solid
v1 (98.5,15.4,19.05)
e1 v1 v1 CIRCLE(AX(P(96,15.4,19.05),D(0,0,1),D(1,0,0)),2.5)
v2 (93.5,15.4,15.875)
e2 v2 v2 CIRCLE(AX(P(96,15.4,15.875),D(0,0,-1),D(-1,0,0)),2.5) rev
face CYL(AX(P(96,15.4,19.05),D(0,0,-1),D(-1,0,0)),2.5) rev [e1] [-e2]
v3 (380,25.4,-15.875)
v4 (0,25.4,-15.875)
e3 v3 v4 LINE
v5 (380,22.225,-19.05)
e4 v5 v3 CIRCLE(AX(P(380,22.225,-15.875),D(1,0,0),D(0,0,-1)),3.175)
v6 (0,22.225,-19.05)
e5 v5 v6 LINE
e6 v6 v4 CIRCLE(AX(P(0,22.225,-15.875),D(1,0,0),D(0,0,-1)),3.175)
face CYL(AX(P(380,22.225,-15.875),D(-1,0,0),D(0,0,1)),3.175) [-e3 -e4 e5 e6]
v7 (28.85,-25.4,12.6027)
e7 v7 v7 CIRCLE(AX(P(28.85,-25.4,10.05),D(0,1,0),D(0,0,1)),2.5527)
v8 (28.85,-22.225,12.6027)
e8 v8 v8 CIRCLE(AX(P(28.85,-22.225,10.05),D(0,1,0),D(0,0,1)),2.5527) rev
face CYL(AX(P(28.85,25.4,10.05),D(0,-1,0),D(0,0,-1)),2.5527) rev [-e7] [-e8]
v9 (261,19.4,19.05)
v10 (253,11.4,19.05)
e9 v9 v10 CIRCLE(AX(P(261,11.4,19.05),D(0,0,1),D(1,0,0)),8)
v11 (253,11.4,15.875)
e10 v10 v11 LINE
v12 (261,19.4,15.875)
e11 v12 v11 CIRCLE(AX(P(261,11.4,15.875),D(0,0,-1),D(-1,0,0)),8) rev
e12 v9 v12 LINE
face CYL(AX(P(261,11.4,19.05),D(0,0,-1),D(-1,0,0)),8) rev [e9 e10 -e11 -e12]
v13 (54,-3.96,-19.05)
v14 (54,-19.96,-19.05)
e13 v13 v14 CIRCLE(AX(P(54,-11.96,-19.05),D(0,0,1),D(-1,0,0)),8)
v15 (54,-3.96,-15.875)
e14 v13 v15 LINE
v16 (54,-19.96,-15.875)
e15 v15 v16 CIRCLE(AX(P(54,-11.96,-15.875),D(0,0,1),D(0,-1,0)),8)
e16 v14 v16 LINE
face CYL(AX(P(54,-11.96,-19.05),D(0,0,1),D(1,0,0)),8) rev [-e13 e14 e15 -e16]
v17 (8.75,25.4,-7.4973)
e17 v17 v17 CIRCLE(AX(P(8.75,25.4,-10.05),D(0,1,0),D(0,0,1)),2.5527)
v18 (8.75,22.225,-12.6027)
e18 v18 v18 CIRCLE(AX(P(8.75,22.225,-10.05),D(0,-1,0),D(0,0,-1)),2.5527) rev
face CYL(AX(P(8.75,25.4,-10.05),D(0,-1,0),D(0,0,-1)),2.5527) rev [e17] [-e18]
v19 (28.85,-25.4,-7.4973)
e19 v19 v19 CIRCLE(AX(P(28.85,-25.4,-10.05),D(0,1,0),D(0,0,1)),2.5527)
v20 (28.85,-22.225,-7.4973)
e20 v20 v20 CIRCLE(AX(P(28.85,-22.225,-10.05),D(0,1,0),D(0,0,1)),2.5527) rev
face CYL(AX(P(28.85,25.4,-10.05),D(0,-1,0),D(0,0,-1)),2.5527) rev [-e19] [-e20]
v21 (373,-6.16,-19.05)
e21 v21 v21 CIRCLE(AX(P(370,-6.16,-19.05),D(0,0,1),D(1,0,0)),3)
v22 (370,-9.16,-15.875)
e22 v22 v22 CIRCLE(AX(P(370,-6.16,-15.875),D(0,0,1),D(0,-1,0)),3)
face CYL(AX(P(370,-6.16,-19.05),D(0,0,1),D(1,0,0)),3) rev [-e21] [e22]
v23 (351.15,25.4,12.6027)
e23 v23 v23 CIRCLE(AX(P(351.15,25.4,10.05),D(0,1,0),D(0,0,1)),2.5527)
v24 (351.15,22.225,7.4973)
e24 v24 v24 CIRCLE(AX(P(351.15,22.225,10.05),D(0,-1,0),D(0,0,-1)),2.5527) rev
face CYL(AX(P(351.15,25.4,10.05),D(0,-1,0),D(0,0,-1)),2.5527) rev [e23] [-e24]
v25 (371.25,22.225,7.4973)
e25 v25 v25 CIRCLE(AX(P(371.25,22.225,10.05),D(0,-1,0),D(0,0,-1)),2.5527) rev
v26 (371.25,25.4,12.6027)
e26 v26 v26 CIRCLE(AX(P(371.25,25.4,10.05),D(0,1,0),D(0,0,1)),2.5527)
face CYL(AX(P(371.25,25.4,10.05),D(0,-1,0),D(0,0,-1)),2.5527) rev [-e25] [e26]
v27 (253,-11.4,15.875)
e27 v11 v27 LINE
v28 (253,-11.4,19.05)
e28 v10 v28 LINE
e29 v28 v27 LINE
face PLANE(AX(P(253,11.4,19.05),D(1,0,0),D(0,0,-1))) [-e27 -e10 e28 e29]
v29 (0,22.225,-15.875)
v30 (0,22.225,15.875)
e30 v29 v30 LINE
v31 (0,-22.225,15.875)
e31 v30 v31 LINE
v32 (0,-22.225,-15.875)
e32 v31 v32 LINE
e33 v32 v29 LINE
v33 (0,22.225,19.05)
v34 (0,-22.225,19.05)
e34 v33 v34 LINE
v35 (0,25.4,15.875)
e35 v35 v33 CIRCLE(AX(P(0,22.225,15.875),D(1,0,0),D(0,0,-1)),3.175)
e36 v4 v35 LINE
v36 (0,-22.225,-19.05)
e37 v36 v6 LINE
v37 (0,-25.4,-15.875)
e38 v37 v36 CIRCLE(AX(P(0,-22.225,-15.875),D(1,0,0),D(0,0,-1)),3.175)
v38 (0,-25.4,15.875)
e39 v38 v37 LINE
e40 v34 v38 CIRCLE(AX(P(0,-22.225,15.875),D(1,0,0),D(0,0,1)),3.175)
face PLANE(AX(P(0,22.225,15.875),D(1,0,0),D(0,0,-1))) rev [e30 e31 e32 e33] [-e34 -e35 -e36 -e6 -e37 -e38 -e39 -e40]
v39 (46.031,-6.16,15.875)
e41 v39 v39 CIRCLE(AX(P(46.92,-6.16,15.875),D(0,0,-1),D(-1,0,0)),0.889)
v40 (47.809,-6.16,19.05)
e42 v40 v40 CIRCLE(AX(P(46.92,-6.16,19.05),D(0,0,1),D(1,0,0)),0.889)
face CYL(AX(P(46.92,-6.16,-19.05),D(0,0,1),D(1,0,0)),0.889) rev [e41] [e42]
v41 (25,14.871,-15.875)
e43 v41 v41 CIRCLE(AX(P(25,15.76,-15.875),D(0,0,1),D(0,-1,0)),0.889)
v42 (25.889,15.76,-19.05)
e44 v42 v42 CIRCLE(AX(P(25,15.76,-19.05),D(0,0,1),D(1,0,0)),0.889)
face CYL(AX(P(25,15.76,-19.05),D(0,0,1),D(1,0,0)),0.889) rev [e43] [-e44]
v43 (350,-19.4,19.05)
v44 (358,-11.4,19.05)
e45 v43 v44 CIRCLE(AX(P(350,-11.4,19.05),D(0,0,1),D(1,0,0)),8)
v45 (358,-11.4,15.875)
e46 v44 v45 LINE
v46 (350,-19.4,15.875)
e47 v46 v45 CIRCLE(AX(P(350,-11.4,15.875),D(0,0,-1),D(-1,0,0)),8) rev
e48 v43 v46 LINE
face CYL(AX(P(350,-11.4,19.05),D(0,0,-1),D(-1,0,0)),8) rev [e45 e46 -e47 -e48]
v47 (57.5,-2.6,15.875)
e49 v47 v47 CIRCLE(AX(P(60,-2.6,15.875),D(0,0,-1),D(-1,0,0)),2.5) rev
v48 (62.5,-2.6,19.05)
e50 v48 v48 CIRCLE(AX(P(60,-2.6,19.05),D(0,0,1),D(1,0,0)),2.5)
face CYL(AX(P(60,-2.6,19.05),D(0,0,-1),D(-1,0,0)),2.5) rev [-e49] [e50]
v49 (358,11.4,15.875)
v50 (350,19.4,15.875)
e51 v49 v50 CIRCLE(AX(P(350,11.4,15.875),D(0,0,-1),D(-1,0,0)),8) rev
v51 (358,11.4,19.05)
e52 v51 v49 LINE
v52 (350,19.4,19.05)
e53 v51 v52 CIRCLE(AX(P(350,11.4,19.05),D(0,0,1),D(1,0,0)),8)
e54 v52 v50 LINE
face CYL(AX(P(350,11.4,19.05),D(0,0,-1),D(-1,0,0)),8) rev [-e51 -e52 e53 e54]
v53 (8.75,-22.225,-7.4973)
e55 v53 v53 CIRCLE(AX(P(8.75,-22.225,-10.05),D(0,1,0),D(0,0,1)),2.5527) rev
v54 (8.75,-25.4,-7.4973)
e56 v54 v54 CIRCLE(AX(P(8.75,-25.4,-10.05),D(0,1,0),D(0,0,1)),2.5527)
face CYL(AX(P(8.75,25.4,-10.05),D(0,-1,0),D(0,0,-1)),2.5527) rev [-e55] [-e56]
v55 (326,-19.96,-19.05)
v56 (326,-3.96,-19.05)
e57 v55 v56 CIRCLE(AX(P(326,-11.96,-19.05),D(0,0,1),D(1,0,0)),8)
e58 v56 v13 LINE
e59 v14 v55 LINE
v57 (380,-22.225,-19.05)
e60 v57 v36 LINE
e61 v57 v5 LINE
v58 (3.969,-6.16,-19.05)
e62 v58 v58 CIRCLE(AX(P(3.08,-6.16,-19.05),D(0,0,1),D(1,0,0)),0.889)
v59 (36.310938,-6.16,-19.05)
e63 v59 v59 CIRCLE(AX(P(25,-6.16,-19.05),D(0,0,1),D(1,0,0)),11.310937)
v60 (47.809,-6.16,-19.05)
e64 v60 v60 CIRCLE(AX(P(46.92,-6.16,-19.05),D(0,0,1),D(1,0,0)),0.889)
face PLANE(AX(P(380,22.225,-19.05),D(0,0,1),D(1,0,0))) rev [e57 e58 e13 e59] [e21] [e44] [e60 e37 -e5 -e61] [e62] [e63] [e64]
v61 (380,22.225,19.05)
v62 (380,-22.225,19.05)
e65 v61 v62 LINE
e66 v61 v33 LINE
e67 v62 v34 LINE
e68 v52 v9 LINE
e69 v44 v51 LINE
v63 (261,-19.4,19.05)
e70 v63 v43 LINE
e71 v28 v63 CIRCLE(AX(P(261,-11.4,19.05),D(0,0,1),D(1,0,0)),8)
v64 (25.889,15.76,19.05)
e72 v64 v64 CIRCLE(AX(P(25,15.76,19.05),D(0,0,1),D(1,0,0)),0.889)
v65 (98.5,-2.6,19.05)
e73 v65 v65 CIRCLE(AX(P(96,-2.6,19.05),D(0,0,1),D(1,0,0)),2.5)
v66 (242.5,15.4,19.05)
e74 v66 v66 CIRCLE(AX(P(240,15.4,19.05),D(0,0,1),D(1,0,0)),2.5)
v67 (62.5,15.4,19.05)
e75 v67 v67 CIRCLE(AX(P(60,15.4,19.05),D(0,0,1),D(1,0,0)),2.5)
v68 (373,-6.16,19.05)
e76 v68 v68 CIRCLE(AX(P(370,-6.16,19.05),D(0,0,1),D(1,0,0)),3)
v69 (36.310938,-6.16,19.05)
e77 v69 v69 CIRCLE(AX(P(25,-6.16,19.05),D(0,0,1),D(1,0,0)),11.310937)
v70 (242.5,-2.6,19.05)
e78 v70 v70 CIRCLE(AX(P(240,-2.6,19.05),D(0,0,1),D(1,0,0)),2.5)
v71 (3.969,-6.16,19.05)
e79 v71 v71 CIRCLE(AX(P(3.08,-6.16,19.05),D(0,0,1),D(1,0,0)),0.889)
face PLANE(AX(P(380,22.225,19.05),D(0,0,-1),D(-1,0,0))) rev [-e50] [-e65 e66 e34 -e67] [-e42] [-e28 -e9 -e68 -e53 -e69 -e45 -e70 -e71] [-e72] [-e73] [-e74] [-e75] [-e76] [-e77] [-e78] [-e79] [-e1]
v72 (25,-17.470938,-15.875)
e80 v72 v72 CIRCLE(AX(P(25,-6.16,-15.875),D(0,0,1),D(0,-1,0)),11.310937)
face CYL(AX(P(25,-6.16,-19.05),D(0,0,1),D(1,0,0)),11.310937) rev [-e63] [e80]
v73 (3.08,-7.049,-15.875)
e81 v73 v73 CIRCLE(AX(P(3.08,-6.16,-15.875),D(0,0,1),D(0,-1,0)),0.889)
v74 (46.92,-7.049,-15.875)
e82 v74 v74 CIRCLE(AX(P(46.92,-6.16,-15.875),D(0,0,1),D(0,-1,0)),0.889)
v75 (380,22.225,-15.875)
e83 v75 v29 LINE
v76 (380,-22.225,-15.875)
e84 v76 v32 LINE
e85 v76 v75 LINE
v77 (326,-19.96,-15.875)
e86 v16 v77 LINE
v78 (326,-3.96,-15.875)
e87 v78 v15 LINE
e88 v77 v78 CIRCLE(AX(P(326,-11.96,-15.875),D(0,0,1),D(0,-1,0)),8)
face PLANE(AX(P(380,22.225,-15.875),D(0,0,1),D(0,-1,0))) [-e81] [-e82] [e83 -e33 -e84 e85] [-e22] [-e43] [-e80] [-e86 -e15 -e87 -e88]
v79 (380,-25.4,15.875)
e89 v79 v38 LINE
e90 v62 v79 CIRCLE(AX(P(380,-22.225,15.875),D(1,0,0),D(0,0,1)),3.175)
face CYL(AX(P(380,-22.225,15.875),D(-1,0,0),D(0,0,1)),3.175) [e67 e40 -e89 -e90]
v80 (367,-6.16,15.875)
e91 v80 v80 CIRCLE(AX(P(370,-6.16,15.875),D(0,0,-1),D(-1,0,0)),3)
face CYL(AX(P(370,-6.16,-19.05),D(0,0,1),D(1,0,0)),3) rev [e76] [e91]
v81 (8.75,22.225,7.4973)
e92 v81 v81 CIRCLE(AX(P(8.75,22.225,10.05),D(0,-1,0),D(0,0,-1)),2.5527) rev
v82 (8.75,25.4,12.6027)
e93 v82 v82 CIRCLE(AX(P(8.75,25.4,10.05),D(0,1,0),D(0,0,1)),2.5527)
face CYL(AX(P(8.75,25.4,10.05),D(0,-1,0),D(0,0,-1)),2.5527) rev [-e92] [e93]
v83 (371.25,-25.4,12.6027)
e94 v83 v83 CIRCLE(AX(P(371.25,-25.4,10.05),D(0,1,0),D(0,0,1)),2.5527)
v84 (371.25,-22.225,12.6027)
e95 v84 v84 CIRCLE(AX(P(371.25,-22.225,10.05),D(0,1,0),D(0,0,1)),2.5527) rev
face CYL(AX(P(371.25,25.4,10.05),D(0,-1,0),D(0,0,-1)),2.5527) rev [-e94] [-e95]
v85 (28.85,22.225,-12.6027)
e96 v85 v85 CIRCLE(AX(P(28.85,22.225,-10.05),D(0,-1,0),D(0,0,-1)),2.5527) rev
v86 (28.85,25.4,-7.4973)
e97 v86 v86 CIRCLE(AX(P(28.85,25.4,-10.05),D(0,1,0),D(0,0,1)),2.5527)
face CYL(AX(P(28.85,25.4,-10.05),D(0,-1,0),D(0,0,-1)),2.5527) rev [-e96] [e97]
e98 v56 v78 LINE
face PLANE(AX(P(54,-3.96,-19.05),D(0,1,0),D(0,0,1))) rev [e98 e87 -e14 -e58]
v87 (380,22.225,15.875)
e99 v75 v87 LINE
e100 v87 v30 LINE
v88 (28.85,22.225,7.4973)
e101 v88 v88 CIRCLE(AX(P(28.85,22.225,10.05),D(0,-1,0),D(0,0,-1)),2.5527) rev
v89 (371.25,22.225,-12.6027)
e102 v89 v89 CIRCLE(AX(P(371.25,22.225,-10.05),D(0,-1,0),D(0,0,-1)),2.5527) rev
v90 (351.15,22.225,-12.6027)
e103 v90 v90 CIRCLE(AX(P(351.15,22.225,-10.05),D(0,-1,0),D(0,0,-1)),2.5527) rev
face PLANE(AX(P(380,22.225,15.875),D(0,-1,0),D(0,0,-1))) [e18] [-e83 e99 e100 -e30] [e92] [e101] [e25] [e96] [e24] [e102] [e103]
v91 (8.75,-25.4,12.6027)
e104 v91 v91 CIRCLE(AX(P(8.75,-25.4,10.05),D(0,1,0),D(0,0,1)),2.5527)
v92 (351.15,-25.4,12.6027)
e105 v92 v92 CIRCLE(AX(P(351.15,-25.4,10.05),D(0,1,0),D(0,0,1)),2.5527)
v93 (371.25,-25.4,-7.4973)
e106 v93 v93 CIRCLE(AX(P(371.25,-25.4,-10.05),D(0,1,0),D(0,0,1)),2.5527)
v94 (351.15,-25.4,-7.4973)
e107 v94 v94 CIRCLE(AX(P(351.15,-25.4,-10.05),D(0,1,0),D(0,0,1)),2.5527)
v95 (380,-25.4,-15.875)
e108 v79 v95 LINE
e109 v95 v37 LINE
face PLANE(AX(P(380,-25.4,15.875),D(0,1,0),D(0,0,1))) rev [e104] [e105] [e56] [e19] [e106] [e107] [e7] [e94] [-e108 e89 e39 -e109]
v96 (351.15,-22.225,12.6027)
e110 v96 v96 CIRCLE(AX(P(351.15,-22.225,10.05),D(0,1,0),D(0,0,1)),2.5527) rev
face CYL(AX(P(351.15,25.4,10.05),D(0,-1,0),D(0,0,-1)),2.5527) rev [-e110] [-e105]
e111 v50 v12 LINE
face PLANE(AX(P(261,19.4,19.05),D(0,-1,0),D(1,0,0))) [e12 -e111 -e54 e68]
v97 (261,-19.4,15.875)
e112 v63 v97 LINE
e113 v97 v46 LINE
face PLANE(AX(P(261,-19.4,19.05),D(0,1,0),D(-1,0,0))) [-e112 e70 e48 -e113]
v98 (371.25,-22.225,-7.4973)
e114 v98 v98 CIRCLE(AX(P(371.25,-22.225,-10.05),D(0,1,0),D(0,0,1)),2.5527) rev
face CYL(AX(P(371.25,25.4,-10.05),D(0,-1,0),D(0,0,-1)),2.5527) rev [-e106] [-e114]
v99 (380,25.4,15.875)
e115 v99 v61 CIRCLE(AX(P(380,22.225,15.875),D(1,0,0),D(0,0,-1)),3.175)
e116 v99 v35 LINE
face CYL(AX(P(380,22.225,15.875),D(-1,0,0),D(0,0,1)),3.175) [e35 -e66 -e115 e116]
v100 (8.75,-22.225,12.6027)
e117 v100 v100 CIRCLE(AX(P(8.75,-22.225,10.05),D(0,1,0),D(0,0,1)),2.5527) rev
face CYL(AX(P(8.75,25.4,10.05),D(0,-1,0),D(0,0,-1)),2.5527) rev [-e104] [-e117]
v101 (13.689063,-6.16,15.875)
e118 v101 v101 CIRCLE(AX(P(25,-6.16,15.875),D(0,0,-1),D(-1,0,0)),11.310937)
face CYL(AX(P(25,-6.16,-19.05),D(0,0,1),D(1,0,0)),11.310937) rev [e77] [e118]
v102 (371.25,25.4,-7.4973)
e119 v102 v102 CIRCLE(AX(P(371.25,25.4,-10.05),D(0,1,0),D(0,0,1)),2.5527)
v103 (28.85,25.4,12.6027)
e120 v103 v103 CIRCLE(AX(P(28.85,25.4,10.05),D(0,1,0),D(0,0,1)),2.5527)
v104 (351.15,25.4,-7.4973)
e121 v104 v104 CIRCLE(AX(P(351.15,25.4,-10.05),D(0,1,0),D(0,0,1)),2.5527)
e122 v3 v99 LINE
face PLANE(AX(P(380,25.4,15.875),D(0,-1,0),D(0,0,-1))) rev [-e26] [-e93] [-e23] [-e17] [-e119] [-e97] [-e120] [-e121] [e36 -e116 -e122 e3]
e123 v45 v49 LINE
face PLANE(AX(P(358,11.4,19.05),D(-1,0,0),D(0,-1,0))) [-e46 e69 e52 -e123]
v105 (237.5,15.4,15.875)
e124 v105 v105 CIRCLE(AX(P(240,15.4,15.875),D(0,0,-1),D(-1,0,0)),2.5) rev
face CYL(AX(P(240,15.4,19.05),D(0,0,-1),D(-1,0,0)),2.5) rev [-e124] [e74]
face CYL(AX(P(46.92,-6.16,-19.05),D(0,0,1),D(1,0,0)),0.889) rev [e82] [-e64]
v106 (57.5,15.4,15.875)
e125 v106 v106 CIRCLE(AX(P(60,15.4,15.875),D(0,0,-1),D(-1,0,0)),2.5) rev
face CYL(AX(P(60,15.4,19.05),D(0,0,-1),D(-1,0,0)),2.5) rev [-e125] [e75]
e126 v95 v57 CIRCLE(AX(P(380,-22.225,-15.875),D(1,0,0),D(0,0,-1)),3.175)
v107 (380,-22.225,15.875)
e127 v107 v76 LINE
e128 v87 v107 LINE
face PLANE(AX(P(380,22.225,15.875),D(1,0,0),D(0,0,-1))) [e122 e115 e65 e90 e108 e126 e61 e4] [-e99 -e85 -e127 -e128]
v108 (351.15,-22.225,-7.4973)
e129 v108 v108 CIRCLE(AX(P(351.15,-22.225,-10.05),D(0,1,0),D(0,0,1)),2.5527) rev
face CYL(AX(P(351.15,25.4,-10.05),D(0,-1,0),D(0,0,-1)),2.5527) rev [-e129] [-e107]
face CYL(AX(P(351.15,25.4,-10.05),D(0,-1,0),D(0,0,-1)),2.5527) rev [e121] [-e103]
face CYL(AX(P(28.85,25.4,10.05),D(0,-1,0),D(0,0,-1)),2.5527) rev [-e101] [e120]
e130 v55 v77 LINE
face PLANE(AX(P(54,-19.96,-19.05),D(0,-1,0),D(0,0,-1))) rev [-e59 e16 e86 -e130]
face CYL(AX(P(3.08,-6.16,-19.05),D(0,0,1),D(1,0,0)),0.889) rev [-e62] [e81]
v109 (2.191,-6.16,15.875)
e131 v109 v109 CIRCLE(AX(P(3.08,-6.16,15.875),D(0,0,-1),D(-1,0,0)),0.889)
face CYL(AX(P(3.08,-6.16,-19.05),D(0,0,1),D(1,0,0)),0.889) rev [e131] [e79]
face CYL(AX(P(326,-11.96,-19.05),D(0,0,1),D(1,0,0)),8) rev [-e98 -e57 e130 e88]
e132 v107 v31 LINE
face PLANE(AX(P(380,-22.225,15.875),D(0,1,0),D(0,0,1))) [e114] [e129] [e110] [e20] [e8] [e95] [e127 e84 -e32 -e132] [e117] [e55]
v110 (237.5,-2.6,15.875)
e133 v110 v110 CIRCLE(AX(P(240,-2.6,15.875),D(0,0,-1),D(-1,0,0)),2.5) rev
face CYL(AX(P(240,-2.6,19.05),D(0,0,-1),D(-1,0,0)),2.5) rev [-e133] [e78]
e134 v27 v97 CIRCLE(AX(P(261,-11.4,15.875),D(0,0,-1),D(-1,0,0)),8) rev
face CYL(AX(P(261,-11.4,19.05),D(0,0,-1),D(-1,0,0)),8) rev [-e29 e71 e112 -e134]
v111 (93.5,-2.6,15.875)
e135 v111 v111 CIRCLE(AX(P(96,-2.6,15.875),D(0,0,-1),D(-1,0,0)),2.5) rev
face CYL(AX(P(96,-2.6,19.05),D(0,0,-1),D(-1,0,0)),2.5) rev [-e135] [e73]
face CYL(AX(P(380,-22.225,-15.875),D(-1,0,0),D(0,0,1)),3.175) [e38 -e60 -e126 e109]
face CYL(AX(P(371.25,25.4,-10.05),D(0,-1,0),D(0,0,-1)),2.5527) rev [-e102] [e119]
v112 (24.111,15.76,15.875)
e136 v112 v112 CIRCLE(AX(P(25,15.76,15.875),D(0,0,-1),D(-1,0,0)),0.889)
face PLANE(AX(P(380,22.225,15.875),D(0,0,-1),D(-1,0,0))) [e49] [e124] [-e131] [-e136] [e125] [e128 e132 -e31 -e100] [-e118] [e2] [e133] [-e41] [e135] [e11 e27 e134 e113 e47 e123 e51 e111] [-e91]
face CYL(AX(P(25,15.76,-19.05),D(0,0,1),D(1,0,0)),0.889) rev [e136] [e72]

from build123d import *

# Parameters (mm, degrees)
MASTEREXTRUSION_EXTRUDE1_OUTLINE_W   = 44.45
MASTEREXTRUSION_EXTRUDE1_OUTLINE_H   = 31.75
MASTEREXTRUSION_EXTRUDE1_DEPTH       = 380
EXTRUDE1_DEPTH                       = 382.324091161
MASTEREXTRUSION_START                = 15.875
MASTEREXTRUSION_DEPTH                = 3.175
EXTRUDE3_DEPTH                       = 382.324091161
EXTRUDE3_DEPTH_BACK                  = 382.324091161
BUSHING_HOLES_MASTEREXTRUSION_2_R    = 3
EXTRUDE4_DEPTH                       = 382.324091161
EXTRUDE4_DEPTH_BACK                  = 382.324091161
MOTOR_MOUNTS_MASTEREXTRUSION_2_R     = 11.3109375
MOTOR_MOUNTS_MASTEREXTRUSION_2_R_2   = 0.889
EXTRUDE5_DEPTH                       = 382.324091161
EXTRUDE5_DEPTH_BACK                  = 382.324091161
SKETCH7_MASTEREXTRUSION_2_R          = 2.5527
Z_MOUNTING_HOLES_MASTEREXTRUSION_3_R = 2.5
EXTRUDE7_DEPTH                       = 382.324091161


# Read off the part's stored shape, not the designer's step: <MasterExtrusion>-<Extrude1>, MasterExtrusion
with BuildPart() as part:
    # <MasterExtrusion>-<Extrude1> outline → <MasterExtrusion>-<Extrude1> (new body)
    with BuildSketch(Plane.YZ):
        with BuildLine():
            ThreePointArc((25.4, 15.875), (24.47006403, 18.12006403), (22.225, 19.05))
            Line((22.225, 19.05), (-22.225, 19.05))
            ThreePointArc((-22.225, 19.05), (-24.47006403, 18.12006403), (-25.4, 15.875))
            Line((-25.4, 15.875), (-25.4, -15.875))
            ThreePointArc((-25.4, -15.875), (-24.47006403, -18.12006403), (-22.225, -19.05))
            Line((-22.225, -19.05), (22.225, -19.05))
            ThreePointArc((22.225, -19.05), (24.47006403, -18.12006403), (25.4, -15.875))
            Line((25.4, -15.875), (25.4, 15.875))
        make_face()
        Rectangle(MASTEREXTRUSION_EXTRUDE1_OUTLINE_W, MASTEREXTRUSION_EXTRUDE1_OUTLINE_H, mode=Mode.SUBTRACT)
    extrude(amount=MASTEREXTRUSION_EXTRUDE1_DEPTH)

    # Track-MasterExtrusion<2> → Extrude1 (cut, through all)
    with BuildSketch(Plane.XY):
        with BuildLine():
            Line((54, -3.96), (326, -3.96))
            ThreePointArc((326, -3.96), (334, -11.96), (326, -19.96))
            Line((326, -19.96), (54, -19.96))
            ThreePointArc((54, -19.96), (46, -11.96), (54, -3.96))
        make_face()
    extrude(amount=-EXTRUDE1_DEPTH, mode=Mode.SUBTRACT)

    # MasterExtrusion outline → MasterExtrusion (cut)
    with BuildSketch(Plane.XY.offset(MASTEREXTRUSION_START)):
        with BuildLine():
            ThreePointArc((261, 19.4), (255.343145751, 17.056854249), (253, 11.4))
            Line((253, 11.4), (253, -11.4))
            ThreePointArc((253, -11.4), (255.343145751, -17.056854249), (261, -19.4))
            Line((261, -19.4), (350, -19.4))
            ThreePointArc((350, -19.4), (355.656854249, -17.056854249), (358, -11.4))
            Line((358, -11.4), (358, 11.4))
            ThreePointArc((358, 11.4), (355.656854249, 17.056854249), (350, 19.4))
            Line((350, 19.4), (261, 19.4))
        make_face()
    extrude(amount=MASTEREXTRUSION_DEPTH, mode=Mode.SUBTRACT)

    # Bushing Holes-MasterExtrusion<2> → Extrude3 (cut, two sides: drawn at the far end of the back side and taken through both)
    with BuildSketch(Plane.XY.offset(-EXTRUDE3_DEPTH_BACK)):
        with Locations((25, -6.16)):
            Circle(BUSHING_HOLES_MASTEREXTRUSION_2_R)
        with Locations((370, -6.16)):
            Circle(BUSHING_HOLES_MASTEREXTRUSION_2_R)
    extrude(amount=EXTRUDE3_DEPTH + EXTRUDE3_DEPTH_BACK, mode=Mode.SUBTRACT)

    # Motor Mounts-MasterExtrusion<2> → Extrude4 (cut, two sides: drawn at the far end of the back side and taken through both)
    with BuildSketch(Plane.XY.offset(-EXTRUDE4_DEPTH_BACK)):
        with Locations((25, -6.16)):
            Circle(MOTOR_MOUNTS_MASTEREXTRUSION_2_R)
        with Locations((3.08, -6.16)):
            Circle(MOTOR_MOUNTS_MASTEREXTRUSION_2_R_2)
        with Locations((25, 15.76)):
            Circle(MOTOR_MOUNTS_MASTEREXTRUSION_2_R_2)
        with Locations((46.92, -6.16)):
            Circle(MOTOR_MOUNTS_MASTEREXTRUSION_2_R_2)
        with Locations((25, -28.08)):
            Circle(MOTOR_MOUNTS_MASTEREXTRUSION_2_R_2)
    extrude(amount=EXTRUDE4_DEPTH + EXTRUDE4_DEPTH_BACK, mode=Mode.SUBTRACT)

    # Sketch7-MasterExtrusion<2> → Extrude5 (cut, two sides: drawn at the far end of the back side and taken through both)
    with BuildSketch(Plane(origin=(0, 0, 0), x_dir=(1, 0, 0), z_dir=(0, 1, 0)).offset(-EXTRUDE5_DEPTH_BACK)):
        with Locations(Location((8.75, 10.05, 0), (0, 0, 90))):
            Circle(SKETCH7_MASTEREXTRUSION_2_R)
        with Locations(Location((28.85, 10.05, 0), (0, 0, 90))):
            Circle(SKETCH7_MASTEREXTRUSION_2_R)
        with Locations(Location((28.85, -10.05, 0), (0, 0, 90))):
            Circle(SKETCH7_MASTEREXTRUSION_2_R)
        with Locations(Location((8.75, -10.05, 0), (0, 0, 90))):
            Circle(SKETCH7_MASTEREXTRUSION_2_R)
        with Locations(Location((351.15, 10.05, 0), (0, 0, 90))):
            Circle(SKETCH7_MASTEREXTRUSION_2_R)
        with Locations(Location((371.25, 10.05, 0), (0, 0, 90))):
            Circle(SKETCH7_MASTEREXTRUSION_2_R)
        with Locations(Location((371.25, -10.05, 0), (0, 0, 90))):
            Circle(SKETCH7_MASTEREXTRUSION_2_R)
        with Locations(Location((351.15, -10.05, 0), (0, 0, 90))):
            Circle(SKETCH7_MASTEREXTRUSION_2_R)
    extrude(amount=EXTRUDE5_DEPTH + EXTRUDE5_DEPTH_BACK, mode=Mode.SUBTRACT)

    # z mounting holes-MasterExtrusion<3> → Extrude7 (cut, through all)
    with BuildSketch(Plane.XY):
        with Locations(Location((60, 15.4, 0), (0, 0, 180))):
            Circle(Z_MOUNTING_HOLES_MASTEREXTRUSION_3_R)
        with Locations(Location((240, 15.4, 0), (0, 0, 180))):
            Circle(Z_MOUNTING_HOLES_MASTEREXTRUSION_3_R)
        with Locations(Location((240, -2.6, 0), (0, 0, 180))):
            Circle(Z_MOUNTING_HOLES_MASTEREXTRUSION_3_R)
        with Locations(Location((60, -2.6, 0), (0, 0, 180))):
            Circle(Z_MOUNTING_HOLES_MASTEREXTRUSION_3_R)
        with Locations(Location((96, 15.4, 0), (0, 0, 180))):
            Circle(Z_MOUNTING_HOLES_MASTEREXTRUSION_3_R)
        with Locations(Location((96, -2.6, 0), (0, 0, 180))):
            Circle(Z_MOUNTING_HOLES_MASTEREXTRUSION_3_R)
    extrude(amount=EXTRUDE7_DEPTH, mode=Mode.SUBTRACT)


solid = part.part
